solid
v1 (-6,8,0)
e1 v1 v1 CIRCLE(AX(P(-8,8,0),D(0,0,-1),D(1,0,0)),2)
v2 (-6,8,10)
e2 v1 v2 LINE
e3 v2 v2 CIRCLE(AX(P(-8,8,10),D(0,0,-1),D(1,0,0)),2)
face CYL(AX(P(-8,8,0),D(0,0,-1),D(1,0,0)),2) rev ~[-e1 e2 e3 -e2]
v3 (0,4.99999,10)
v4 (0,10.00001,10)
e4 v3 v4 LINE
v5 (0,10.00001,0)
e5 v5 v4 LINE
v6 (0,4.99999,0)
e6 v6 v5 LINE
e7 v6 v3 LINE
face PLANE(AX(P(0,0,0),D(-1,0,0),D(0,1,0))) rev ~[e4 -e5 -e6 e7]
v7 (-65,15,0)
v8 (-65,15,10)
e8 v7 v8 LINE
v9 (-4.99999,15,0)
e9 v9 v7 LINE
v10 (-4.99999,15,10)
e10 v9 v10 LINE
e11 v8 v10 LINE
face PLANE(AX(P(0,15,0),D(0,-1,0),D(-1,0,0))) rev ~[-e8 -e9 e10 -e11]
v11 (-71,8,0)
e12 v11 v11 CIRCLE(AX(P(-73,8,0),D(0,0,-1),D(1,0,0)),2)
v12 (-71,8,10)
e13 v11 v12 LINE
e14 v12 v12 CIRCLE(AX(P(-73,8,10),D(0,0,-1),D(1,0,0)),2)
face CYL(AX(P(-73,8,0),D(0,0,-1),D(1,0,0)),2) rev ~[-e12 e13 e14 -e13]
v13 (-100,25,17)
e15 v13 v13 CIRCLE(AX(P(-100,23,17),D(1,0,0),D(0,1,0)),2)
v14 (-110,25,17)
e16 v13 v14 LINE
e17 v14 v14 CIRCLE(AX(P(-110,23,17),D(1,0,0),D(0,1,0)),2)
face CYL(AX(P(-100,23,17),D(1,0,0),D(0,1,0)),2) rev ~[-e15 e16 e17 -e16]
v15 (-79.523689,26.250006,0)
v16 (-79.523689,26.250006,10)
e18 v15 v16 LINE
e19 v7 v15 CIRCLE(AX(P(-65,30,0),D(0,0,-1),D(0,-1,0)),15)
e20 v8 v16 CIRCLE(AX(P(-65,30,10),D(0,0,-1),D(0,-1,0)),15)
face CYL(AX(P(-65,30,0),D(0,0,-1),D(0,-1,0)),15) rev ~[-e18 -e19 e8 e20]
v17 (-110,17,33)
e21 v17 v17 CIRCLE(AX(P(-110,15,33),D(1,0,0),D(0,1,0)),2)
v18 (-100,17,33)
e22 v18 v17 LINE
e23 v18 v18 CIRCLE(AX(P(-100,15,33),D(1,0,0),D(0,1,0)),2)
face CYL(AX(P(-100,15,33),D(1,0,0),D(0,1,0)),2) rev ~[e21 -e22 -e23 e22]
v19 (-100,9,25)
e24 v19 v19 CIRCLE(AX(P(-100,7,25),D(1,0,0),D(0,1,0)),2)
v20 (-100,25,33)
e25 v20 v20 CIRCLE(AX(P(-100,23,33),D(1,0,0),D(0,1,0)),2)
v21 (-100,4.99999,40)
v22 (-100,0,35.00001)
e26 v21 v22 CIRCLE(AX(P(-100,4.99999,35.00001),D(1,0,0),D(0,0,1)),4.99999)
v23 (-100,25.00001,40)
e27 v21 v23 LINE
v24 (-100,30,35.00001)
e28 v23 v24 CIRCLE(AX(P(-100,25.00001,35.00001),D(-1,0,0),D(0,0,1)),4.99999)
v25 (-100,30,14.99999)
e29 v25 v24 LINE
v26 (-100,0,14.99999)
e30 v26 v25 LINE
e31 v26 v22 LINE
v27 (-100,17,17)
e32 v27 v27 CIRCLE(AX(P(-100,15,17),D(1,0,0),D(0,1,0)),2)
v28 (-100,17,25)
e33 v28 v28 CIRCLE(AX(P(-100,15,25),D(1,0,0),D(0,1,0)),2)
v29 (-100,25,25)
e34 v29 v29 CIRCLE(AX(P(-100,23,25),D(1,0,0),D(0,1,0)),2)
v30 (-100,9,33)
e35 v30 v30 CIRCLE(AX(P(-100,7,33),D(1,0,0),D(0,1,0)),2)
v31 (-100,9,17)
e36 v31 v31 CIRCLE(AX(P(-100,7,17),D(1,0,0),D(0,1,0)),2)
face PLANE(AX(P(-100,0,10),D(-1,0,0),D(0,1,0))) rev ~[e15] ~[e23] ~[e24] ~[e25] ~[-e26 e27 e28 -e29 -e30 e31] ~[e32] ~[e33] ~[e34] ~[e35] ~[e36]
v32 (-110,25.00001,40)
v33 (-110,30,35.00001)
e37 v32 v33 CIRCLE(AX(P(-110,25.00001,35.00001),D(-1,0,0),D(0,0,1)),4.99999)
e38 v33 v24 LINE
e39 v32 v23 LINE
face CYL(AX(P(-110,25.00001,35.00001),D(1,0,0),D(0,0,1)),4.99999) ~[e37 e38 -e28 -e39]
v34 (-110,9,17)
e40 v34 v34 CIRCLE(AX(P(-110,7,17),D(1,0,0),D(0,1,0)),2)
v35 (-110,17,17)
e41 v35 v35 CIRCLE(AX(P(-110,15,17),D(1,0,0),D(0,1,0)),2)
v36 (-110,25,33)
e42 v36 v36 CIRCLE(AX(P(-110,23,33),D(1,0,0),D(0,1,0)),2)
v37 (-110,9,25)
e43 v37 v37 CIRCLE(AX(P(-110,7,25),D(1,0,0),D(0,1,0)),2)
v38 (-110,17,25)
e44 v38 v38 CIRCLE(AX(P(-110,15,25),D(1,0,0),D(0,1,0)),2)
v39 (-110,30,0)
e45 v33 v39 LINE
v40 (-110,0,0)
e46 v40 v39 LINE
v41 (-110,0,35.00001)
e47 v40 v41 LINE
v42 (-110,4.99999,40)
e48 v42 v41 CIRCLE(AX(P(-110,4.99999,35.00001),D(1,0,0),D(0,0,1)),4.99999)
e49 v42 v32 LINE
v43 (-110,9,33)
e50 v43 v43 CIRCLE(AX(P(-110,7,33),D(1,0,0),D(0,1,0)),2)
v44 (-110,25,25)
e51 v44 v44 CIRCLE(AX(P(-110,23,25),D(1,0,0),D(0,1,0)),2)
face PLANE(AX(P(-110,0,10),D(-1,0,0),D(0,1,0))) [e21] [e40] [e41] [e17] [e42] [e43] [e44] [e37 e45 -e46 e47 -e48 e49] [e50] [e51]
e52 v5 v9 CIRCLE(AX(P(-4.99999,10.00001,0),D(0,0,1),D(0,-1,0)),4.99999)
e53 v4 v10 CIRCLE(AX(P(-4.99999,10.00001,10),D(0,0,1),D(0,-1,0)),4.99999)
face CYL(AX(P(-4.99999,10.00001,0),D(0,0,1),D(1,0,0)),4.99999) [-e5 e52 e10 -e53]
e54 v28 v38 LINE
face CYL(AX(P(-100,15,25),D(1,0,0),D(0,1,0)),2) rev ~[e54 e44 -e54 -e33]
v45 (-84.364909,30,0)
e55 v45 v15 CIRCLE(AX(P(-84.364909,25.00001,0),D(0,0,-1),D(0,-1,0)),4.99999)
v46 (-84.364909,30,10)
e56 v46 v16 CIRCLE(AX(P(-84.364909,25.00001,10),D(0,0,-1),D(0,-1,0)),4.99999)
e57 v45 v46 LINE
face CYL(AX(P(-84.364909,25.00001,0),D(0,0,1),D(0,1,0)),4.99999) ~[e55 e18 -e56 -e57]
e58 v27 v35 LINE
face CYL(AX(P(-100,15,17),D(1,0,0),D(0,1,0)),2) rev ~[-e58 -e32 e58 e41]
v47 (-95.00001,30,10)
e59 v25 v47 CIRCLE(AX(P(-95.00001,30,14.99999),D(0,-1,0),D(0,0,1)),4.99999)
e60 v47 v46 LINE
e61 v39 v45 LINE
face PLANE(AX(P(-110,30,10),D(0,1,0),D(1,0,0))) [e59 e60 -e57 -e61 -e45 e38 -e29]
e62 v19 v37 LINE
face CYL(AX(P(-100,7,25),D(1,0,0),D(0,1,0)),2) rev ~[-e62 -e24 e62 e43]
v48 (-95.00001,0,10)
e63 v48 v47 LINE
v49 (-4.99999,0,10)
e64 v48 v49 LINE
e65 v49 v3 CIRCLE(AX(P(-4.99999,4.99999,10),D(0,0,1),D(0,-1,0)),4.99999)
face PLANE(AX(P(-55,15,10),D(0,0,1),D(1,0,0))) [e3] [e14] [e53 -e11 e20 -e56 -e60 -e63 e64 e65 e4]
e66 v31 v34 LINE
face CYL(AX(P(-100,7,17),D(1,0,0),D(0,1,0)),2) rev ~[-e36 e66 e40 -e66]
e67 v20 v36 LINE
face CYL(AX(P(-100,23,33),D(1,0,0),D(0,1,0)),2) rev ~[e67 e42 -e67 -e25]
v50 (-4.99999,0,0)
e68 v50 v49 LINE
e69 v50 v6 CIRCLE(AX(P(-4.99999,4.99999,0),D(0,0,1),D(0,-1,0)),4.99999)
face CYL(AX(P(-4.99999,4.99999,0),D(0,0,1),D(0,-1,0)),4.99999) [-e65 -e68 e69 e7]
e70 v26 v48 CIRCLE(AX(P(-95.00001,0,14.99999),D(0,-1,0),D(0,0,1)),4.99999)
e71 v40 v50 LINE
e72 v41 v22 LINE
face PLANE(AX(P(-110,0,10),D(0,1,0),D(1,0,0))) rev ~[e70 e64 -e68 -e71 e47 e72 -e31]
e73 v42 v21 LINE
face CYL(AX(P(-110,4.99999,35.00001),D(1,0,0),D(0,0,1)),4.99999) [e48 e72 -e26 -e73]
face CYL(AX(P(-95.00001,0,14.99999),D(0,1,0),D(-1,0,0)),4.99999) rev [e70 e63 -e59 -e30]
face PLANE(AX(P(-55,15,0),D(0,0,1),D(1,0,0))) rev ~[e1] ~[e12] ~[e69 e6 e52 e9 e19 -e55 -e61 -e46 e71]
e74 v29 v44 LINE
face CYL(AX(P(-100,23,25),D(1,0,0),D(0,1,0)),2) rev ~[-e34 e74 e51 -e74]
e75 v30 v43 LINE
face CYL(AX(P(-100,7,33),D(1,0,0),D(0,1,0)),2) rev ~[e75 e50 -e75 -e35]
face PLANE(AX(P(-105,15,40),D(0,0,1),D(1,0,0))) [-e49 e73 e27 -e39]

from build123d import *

# Parameters (mm, degrees)
F0_W     = 110
F0_H     = 30
F1_DEPTH = 10
F2_R     = 2
F3_DEPTH = 25
F4_W     = 10
F4_H     = 30
F5_DEPTH = 30
F6_R     = 2
F7_DEPTH = 25
F8_R     = 4.99999


# Not quite as in the source:
# - a fillet or chamfer is up to 0.001 mm smaller than in the source, because OpenCascade refuses the exact size
# - a feature names something its author has since deleted; it is built from what else it names


with BuildPart() as f1:
    # F0 (on Top) → F1 (new body)
    with BuildSketch(Plane.XY):
        with Locations((-55, 15)):
            Rectangle(F0_W, F0_H)
    extrude(amount=F1_DEPTH)

    # F2 (on face) → F3 (cut)
    with BuildSketch(Plane(origin=(0, 0, 0), x_dir=(1, 0, 0), z_dir=(0, 0, -1))):
        with Locations((-8, -8)):
            Circle(F2_R)
        with Locations((-73, -8)):
            Circle(F2_R)
        with BuildLine():
            Line((0, -30), (0, -15))
            Line((0, -15), (-65, -15))
            ThreePointArc((-65, -15), (-75.6066017178, -19.3933982822), (-80, -30))
            Line((-80, -30), (0, -30))
        make_face()
    extrude(amount=-F3_DEPTH, mode=Mode.SUBTRACT)

    # F4 (on face) → F5 (join)
    with BuildSketch(Plane.XY.offset(10)):
        with Locations((-105, 15)):
            Rectangle(F4_W, F4_H)
    extrude(amount=F5_DEPTH)

    # F6 (on face) → F7 (cut)
    with BuildSketch(Plane.YZ.offset(-100)):
        with Locations((7, 17)):
            Circle(F6_R)
        with Locations((7, 25)):
            Circle(F6_R)
        with Locations((15, 33)):
            Circle(F6_R)
        with Locations((7, 33)):
            Circle(F6_R)
        with Locations((15, 25)):
            Circle(F6_R)
        with Locations((15, 17)):
            Circle(F6_R)
        with Locations((23, 17)):
            Circle(F6_R)
        with Locations((23, 25)):
            Circle(F6_R)
        with Locations((23, 33)):
            Circle(F6_R)
    extrude(amount=-F7_DEPTH, mode=Mode.SUBTRACT)

    # F8 (radius 5 in the source; OpenCascade refuses exactly that, so slightly less here)
    f8_edges = [f1.edges().sort_by_distance(p)[0] for p in [
        (0, 15, 5),
        (0, 0, 5),
        (-80, 30, 5),
        (-105, 30, 40),
        (-105, 0, 40),
        (-100, 15, 10),
    ]]
    fillet(f8_edges, radius=F8_R)


solid = f1.part
